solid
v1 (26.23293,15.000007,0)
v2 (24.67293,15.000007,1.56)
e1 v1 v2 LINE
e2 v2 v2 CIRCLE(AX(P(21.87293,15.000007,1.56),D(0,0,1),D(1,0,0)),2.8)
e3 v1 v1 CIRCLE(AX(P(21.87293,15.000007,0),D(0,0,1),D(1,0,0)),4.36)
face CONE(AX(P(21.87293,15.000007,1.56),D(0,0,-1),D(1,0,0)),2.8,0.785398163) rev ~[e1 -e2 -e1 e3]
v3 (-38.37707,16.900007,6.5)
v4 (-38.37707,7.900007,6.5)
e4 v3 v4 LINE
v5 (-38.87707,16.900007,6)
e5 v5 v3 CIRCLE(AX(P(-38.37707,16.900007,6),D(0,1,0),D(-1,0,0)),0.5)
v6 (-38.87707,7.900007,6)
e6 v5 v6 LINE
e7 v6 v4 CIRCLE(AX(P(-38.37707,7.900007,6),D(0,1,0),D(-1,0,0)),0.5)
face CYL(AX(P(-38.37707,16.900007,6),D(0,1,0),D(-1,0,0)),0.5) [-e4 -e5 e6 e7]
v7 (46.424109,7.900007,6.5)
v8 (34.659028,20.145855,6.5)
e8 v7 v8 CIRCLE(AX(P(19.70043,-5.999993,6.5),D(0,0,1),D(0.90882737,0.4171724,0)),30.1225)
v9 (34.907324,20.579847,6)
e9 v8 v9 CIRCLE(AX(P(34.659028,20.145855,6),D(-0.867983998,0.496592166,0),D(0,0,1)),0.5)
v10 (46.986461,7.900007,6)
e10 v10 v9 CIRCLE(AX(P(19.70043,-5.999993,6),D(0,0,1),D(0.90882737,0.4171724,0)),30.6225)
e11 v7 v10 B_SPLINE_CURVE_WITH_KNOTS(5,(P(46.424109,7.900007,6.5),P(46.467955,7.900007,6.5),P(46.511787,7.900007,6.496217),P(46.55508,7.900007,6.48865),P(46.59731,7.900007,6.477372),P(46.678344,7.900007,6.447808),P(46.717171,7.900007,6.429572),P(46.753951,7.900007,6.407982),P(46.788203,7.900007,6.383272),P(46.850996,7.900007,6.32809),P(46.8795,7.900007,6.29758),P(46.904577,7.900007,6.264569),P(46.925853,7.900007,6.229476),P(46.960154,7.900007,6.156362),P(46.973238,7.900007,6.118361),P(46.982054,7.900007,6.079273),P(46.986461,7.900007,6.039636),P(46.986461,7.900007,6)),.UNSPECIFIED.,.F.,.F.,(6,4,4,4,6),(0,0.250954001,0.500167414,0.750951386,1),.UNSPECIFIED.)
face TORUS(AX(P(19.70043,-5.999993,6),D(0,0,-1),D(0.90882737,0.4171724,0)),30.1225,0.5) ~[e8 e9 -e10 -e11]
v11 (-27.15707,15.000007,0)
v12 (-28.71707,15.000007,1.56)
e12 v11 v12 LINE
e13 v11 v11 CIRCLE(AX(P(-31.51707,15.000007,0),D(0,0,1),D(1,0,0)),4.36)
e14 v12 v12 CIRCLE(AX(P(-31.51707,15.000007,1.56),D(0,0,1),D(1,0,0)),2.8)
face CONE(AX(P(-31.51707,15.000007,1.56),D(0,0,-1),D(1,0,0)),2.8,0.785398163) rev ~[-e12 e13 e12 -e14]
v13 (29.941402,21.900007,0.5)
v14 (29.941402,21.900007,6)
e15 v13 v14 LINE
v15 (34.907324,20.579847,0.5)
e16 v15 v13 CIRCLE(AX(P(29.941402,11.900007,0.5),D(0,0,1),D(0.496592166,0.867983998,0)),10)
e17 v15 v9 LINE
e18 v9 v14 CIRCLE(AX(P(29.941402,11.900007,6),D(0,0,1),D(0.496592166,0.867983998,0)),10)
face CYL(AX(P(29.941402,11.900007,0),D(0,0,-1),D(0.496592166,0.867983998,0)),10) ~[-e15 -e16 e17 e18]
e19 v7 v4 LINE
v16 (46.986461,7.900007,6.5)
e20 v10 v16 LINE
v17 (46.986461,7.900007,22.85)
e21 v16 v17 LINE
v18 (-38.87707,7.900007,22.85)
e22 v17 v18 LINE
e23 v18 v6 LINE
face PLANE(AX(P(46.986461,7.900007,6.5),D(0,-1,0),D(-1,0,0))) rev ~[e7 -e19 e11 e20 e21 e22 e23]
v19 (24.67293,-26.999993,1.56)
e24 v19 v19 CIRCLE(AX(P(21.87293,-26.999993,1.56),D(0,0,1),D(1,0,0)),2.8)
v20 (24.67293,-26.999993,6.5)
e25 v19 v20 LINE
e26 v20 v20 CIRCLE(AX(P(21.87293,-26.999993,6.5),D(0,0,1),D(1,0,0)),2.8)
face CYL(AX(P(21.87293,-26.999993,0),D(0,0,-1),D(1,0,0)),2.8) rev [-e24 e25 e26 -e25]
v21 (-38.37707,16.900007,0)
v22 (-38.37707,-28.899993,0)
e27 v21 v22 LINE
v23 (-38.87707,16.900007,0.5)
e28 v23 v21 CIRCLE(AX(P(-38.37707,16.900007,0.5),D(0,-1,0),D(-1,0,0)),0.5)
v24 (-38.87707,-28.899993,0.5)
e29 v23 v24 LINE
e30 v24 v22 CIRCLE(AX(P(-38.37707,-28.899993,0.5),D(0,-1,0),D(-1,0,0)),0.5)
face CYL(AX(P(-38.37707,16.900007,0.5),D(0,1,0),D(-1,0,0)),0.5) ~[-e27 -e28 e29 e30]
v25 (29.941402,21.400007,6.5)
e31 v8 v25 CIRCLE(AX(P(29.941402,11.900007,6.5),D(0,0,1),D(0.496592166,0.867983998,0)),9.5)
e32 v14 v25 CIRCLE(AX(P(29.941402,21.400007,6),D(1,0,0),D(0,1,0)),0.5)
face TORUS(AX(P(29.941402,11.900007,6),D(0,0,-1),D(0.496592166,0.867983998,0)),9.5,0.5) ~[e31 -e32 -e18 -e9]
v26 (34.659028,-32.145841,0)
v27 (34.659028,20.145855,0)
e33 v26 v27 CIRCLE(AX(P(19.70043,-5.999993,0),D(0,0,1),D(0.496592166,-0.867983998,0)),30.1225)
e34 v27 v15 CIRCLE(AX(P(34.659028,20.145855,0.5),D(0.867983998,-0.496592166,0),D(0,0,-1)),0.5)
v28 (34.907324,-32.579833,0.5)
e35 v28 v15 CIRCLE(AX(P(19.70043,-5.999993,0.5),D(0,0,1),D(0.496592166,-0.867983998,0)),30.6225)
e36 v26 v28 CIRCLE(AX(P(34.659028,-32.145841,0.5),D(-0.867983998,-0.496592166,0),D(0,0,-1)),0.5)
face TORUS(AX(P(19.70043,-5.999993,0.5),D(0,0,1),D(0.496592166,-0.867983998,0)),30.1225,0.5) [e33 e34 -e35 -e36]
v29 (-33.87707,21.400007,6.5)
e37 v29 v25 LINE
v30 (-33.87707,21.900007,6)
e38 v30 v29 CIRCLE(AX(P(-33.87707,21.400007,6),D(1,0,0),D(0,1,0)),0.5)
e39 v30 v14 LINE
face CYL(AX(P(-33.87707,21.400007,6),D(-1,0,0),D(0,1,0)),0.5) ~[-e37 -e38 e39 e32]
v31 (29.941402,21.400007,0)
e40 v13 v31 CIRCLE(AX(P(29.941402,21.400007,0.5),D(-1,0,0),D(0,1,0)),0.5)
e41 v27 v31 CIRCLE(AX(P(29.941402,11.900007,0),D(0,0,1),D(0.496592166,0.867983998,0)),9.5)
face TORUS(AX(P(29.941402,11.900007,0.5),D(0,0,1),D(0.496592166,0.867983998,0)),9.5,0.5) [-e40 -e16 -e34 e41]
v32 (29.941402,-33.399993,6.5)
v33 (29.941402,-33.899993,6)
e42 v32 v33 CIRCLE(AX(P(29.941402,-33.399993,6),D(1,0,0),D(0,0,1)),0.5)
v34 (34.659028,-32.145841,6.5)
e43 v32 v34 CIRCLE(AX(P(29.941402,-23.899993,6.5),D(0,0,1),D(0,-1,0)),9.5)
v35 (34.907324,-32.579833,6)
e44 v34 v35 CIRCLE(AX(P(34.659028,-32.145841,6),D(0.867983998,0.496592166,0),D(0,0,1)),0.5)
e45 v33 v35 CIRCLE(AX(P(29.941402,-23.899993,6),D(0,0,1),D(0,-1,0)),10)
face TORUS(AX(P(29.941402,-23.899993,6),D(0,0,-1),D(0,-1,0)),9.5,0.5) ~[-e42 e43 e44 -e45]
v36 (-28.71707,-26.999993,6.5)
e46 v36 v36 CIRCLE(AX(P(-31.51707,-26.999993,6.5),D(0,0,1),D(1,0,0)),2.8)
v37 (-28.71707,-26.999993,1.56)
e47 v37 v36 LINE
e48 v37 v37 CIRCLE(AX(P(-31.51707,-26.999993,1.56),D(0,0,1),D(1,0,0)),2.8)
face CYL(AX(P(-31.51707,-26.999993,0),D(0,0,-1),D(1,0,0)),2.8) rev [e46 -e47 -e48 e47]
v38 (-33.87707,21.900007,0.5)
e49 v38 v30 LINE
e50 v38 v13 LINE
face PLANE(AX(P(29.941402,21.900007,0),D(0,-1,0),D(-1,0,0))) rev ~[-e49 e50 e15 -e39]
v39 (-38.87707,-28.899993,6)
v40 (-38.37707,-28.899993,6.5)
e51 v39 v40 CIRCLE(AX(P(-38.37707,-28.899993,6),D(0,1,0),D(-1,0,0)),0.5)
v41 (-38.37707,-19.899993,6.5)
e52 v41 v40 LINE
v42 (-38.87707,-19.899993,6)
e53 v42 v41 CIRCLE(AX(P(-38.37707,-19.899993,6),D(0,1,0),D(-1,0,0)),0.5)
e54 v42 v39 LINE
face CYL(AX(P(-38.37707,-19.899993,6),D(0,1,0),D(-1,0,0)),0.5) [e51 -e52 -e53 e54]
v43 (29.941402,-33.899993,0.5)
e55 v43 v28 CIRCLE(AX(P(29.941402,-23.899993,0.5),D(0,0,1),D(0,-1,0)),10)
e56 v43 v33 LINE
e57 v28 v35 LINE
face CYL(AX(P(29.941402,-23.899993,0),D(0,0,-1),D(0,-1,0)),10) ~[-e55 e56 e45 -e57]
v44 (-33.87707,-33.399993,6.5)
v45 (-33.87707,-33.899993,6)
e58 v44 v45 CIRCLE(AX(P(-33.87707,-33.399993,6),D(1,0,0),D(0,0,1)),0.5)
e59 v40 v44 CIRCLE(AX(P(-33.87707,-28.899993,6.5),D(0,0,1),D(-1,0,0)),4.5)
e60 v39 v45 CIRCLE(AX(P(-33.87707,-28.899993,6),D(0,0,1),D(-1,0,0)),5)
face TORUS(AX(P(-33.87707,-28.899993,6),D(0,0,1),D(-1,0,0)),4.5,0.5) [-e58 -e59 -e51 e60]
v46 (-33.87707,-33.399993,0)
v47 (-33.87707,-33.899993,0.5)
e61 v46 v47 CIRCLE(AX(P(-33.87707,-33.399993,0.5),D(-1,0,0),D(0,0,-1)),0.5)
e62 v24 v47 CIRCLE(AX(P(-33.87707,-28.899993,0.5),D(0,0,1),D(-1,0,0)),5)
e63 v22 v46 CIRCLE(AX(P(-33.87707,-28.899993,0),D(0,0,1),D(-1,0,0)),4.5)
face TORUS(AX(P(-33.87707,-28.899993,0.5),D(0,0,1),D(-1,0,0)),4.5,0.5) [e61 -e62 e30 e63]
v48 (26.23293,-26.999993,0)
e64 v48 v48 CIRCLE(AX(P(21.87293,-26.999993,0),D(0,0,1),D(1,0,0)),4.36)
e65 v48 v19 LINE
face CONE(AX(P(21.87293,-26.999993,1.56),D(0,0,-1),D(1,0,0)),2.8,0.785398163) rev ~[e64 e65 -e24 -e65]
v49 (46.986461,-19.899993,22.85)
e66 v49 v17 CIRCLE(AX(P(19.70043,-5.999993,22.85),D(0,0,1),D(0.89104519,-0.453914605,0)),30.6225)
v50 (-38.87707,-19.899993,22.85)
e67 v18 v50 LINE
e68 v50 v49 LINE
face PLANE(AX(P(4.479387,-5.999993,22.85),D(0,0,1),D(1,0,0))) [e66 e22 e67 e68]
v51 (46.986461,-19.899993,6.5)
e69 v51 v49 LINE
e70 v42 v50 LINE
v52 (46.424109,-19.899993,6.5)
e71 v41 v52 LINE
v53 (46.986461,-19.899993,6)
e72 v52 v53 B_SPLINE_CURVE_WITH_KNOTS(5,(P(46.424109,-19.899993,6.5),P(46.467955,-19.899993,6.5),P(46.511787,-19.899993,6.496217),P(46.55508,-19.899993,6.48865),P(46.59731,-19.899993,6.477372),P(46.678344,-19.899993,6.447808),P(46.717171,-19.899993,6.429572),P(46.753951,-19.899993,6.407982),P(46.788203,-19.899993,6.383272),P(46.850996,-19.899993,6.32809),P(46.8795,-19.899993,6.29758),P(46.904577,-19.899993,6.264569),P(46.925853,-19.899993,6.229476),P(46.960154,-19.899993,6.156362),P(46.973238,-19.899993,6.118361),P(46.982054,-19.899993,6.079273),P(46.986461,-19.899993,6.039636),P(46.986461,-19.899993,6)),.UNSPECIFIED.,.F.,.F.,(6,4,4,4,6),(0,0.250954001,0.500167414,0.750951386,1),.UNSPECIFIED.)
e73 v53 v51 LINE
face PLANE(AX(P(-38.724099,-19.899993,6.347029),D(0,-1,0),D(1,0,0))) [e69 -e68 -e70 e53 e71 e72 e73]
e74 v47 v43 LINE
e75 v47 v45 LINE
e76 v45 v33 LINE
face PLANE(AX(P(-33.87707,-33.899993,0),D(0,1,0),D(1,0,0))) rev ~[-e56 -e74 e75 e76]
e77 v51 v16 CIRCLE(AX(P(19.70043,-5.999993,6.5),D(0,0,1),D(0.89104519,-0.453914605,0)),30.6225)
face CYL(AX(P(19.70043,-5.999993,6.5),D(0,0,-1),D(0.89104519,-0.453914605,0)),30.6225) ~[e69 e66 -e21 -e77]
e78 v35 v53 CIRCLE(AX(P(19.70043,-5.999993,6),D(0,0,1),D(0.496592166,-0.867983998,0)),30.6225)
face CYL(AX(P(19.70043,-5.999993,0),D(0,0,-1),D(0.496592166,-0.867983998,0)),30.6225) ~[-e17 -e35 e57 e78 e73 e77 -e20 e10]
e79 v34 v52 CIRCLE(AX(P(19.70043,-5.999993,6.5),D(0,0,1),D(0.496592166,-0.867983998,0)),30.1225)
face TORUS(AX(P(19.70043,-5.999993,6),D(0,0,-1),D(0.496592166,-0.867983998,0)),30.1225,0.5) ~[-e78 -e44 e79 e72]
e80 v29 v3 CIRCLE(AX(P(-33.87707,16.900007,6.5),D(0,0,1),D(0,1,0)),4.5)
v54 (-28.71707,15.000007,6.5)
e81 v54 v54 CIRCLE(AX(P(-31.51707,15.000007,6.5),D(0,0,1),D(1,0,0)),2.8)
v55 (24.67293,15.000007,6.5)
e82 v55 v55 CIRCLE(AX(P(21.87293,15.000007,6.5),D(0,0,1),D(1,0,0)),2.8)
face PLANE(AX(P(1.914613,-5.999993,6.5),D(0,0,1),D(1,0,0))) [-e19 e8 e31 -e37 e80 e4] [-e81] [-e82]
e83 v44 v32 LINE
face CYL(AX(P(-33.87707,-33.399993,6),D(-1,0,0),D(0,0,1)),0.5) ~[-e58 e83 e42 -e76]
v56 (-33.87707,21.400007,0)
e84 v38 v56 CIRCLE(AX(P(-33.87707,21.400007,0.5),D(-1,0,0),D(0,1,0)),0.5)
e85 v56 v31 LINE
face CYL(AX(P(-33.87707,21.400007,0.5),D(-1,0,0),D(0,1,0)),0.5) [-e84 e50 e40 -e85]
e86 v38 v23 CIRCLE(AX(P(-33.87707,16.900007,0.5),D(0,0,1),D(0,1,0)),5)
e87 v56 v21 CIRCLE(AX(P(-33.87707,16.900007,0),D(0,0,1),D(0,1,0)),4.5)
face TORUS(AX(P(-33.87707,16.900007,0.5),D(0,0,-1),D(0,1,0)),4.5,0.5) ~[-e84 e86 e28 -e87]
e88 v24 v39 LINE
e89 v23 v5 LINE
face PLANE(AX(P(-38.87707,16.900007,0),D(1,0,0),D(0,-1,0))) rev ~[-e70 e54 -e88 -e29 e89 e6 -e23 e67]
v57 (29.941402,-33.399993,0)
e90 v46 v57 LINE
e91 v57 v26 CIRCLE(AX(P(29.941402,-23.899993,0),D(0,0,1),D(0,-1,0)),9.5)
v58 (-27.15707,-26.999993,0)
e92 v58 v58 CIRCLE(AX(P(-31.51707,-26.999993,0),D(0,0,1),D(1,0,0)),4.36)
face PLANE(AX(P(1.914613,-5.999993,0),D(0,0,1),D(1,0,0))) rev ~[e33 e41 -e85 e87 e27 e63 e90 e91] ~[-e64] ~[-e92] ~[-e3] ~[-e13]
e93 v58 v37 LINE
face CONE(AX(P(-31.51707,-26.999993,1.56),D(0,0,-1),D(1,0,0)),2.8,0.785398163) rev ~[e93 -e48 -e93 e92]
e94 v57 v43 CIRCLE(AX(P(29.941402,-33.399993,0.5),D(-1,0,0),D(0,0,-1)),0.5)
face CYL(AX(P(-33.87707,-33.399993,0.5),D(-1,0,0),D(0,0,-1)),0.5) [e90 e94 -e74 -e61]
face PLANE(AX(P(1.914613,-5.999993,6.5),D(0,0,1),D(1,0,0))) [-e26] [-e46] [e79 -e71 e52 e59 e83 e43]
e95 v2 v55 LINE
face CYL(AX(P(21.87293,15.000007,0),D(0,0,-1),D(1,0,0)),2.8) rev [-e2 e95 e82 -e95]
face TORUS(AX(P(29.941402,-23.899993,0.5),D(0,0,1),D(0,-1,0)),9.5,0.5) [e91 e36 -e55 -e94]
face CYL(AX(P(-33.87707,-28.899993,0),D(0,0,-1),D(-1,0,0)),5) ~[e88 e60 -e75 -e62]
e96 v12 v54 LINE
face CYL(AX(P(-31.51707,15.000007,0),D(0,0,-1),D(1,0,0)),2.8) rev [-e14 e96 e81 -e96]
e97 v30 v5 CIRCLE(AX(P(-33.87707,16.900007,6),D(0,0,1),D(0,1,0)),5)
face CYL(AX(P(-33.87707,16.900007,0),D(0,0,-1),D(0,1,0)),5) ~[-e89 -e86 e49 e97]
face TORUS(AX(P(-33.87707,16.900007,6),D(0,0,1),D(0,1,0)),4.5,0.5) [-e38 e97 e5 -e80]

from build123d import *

# Parameters (mm, degrees)
F0_R         = 2.8
F1_DEPTH     = 6.5
F3_DEPTH     = 16.35
F4_T1_DEPTH  = 63.8184719387
F4_T3_DEPTH  = 45.8
F4_T5_DEPTH  = 9
F4_T7_DEPTH  = 9
F4_T10_ANGLE = 90
F4_T12_ANGLE = 120.4504110916
F4_T14_ANGLE = 90
F4_T16_ANGLE = 90
F4_T18_ANGLE = 29.7747944542
F4_T20_ANGLE = 29.7747944542
F4_T22_ANGLE = 29.7747944542
F4_T26_ANGLE = 35.5690080159
F4_T29_ANGLE = 90
F4_T33_ANGLE = 35.5690080159
F4_T36_ANGLE = 29.7747944542
F5_SIZE      = 1.56


# Not quite as in the source:
# - a fillet or chamfer that OpenCascade refuses, or shapes differently, is made with other operations: its cross-section is extruded or revolved along the edge and cut away or added


with BuildPart() as f1:
    # F0 (on Top) → F1 (new body)
    with BuildSketch(Plane.XY):
        with BuildLine():
            Line((-38.8770699501, 16.9000072956), (-38.8770699501, -28.8999927044))
            ThreePointArc((-38.8770699501, -28.8999927044), (-37.412603856, -32.4355266103), (-33.8770699501, -33.8999927044))
            Line((-33.8770699501, -33.8999927044), (29.9414019886, -33.8999927044))
            ThreePointArc((29.9414019886, -33.8999927044), (32.5106042183, -33.5643188528), (34.9073236464, -32.579832685))
            ThreePointArc((34.9073236464, -32.579832685), (50.3229300499, -5.9999927044), (34.9073236464, 20.5798472762))
            ThreePointArc((34.9073236464, 20.5798472762), (32.5106042183, 21.564333444), (29.9414019886, 21.9000072956))
            Line((29.9414019886, 21.9000072956), (-33.8770699501, 21.9000072956))
            ThreePointArc((-33.8770699501, 21.9000072956), (-37.412603856, 20.4355412015), (-38.8770699501, 16.9000072956))
        make_face()
        with Locations((-31.5170697868, -26.9999932498)):
            Circle(F0_R, mode=Mode.SUBTRACT)
        with Locations((21.8729300499, -26.9999927044)):
            Circle(F0_R, mode=Mode.SUBTRACT)
        with Locations((-31.5170697868, 15.0000071153)):
            Circle(F0_R, mode=Mode.SUBTRACT)
        with Locations((21.8729300499, 15.0000072956)):
            Circle(F0_R, mode=Mode.SUBTRACT)
    extrude(amount=F1_DEPTH)

    # F2 (on face) → F3 (join)
    with BuildSketch(Plane.XY.offset(6.5)):
        with BuildLine():
            Line((-38.8770699501, 7.9000072956), (-38.8770699501, -5.9999927044))
            Line((-38.8770699501, -5.9999927044), (-38.8770699501, -19.8999927044))
            Line((-38.8770699501, -19.8999927044), (46.9864613892, -19.8999927044))
            ThreePointArc((46.9864613892, -19.8999927044), (50.3229300499, -5.9999927044), (46.9864613892, 7.9000072956))
            Line((46.9864613892, 7.9000072956), (-38.8770699501, 7.9000072956))
        make_face()
    extrude(amount=F3_DEPTH)

    # F4: fillet of radius 0.5 on 18 edges, made by hand

    # F4_s2 → F4_t1 (cut)
    with BuildSketch(Plane.YZ.offset(-33.8770699501)):
        with BuildLine():
            ThreePointArc((21.9000072956, 0.5), (21.7535606862, 0.1464466094), (21.4000072956, 0))
            Line((21.4000072956, 0), (21.9000072956, 0))
            Line((21.9000072956, 0), (21.9000072956, 0.5))
        make_face()
        with BuildLine():
            ThreePointArc((21.9000072956, 6), (21.7535606862, 6.3535533906), (21.4000072956, 6.5))
            Line((21.4000072956, 6.5), (21.9000072956, 6.5))
            Line((21.9000072956, 6.5), (21.9000072956, 6))
        make_face()
        with BuildLine():
            ThreePointArc((-33.3999927044, 6.5), (-33.753546095, 6.3535533906), (-33.8999927044, 6))
            Line((-33.8999927044, 6), (-33.8999927044, 6.5))
            Line((-33.8999927044, 6.5), (-33.3999927044, 6.5))
        make_face()
        with BuildLine():
            ThreePointArc((-33.3999927044, 0), (-33.753546095, 0.1464466094), (-33.8999927044, 0.5))
            Line((-33.8999927044, 0.5), (-33.8999927044, 0))
            Line((-33.8999927044, 0), (-33.3999927044, 0))
        make_face()
    extrude(amount=F4_T1_DEPTH, mode=Mode.SUBTRACT)

    # F4_s4 → F4_t3 (cut)
    with BuildSketch(Plane.XZ.offset(-16.9000072956)):
        with BuildLine():
            ThreePointArc((-38.8770699501, 0.5), (-38.7306233407, 0.1464466094), (-38.3770699501, 0))
            Line((-38.3770699501, 0), (-38.8770699501, 0))
            Line((-38.8770699501, 0), (-38.8770699501, 0.5))
        make_face()
    extrude(amount=F4_T3_DEPTH, mode=Mode.SUBTRACT)

    # F4_s6 → F4_t5 (cut)
    with BuildSketch(Plane.XZ.offset(-16.9000072956)):
        with BuildLine():
            ThreePointArc((-38.8770699501, 6), (-38.7306233407, 6.3535533906), (-38.3770699501, 6.5))
            Line((-38.3770699501, 6.5), (-38.8770699501, 6.5))
            Line((-38.8770699501, 6.5), (-38.8770699501, 6))
        make_face()
    extrude(amount=F4_T5_DEPTH, mode=Mode.SUBTRACT)

    # F4_s8 → F4_t7 (cut)
    with BuildSketch(Plane.XZ.offset(19.8999927044)):
        with BuildLine():
            ThreePointArc((-38.8770699501, 6), (-38.7306233407, 6.3535533906), (-38.3770699501, 6.5))
            Line((-38.3770699501, 6.5), (-38.8770699501, 6.5))
            Line((-38.8770699501, 6.5), (-38.8770699501, 6))
        make_face()
    extrude(amount=F4_T7_DEPTH, mode=Mode.SUBTRACT)

    # F4_s9 → F4_t10 (revolve, cut)
    with BuildSketch(Plane.YZ.offset(-33.8770699501)):
        with BuildLine():
            ThreePointArc((21.9000072956, 0.5), (21.7535606862, 0.1464466094), (21.4000072956, 0))
            Line((21.4000072956, 0), (21.9000072956, 0))
            Line((21.9000072956, 0), (21.9000072956, 0.5))
        make_face()
    revolve(axis=Axis((-33.8770699501, 16.9000072956, 0), (0, 0, 1)), revolution_arc=F4_T10_ANGLE, mode=Mode.SUBTRACT)

    # F4_s11 → F4_t12 (revolve, cut)
    with BuildSketch(Plane(origin=(12.2560283734, 7.0119353437, 0), x_dir=(0, 0, 1), z_dir=(-0.8679839981, -0.4965921658, 0))):
        with BuildLine():
            ThreePointArc((0, -45.1134768811), (0.1464466094, -45.4670302717), (0.5, -45.6134768811))
            Line((0.5, -45.6134768811), (0, -45.6134768811))
            Line((0, -45.6134768811), (0, -45.1134768811))
        make_face()
    revolve(axis=Axis((19.7004300499, -5.9999927044, 0), (0, 0, 1)), revolution_arc=F4_T12_ANGLE, mode=Mode.SUBTRACT)

    # F4_s13 → F4_t14 (revolve, cut)
    with BuildSketch(Plane.YZ.offset(-33.8770699501)):
        with BuildLine():
            ThreePointArc((21.9000072956, 6), (21.7535606862, 6.3535533906), (21.4000072956, 6.5))
            Line((21.4000072956, 6.5), (21.9000072956, 6.5))
            Line((21.9000072956, 6.5), (21.9000072956, 6))
        make_face()
    revolve(axis=Axis((-33.8770699501, 16.9000072956, 6.5), (0, 0, 1)), revolution_arc=F4_T14_ANGLE, mode=Mode.SUBTRACT)

    # F4_s15 → F4_t16 (revolve, cut)
    with BuildSketch(Plane.XZ.offset(28.8999927044)):
        with BuildLine():
            ThreePointArc((-38.3770699501, 0), (-38.7306233407, 0.1464466094), (-38.8770699501, 0.5))
            Line((-38.8770699501, 0.5), (-38.8770699501, 0))
            Line((-38.8770699501, 0), (-38.3770699501, 0))
        make_face()
    revolve(axis=Axis((-33.8770699501, -28.8999927044, 0), (0, 0, 1)), revolution_arc=F4_T16_ANGLE, mode=Mode.SUBTRACT)

    # F4_s17 → F4_t18 (revolve, cut)
    with BuildSketch(Plane.YZ.offset(29.9414019886)):
        with BuildLine():
            ThreePointArc((-33.3999927044, 0), (-33.753546095, 0.1464466094), (-33.8999927044, 0.5))
            Line((-33.8999927044, 0.5), (-33.8999927044, 0))
            Line((-33.8999927044, 0), (-33.3999927044, 0))
        make_face()
    revolve(axis=Axis((29.9414019886, -23.8999927044, 0), (0, 0, 1)), revolution_arc=F4_T18_ANGLE, mode=Mode.SUBTRACT)

    # F4_s19 → F4_t20 (revolve, cut)
    with BuildSketch(Plane(origin=(17.4284307256, -9.9711770948, 0), x_dir=(0, 0, 1), z_dir=(0.8679839981, -0.4965921658, 0))):
        with BuildLine():
            ThreePointArc((0, -34.6976815693), (0.1464466094, -35.0512349599), (0.5, -35.1976815693))
            Line((0.5, -35.1976815693), (0, -35.1976815693))
            Line((0, -35.1976815693), (0, -34.6976815693))
        make_face()
    revolve(axis=Axis((29.9414019886, 11.9000072956, 0), (0, 0, 1)), revolution_arc=F4_T20_ANGLE, mode=Mode.SUBTRACT)

    # F4_s21 → F4_t22 (revolve, cut)
    with BuildSketch(Plane(origin=(17.4284307256, -9.9711770948, 0), x_dir=(0, 0, 1), z_dir=(0.8679839981, -0.4965921658, 0))):
        with BuildLine():
            ThreePointArc((6.5, -34.6976815693), (6.3535533906, -35.0512349599), (6, -35.1976815693))
            Line((6, -35.1976815693), (6.5, -35.1976815693))
            Line((6.5, -35.1976815693), (6.5, -34.6976815693))
        make_face()
    revolve(axis=Axis((29.9414019886, 11.9000072956, 6.5), (0, 0, 1)), revolution_arc=F4_T22_ANGLE, mode=Mode.SUBTRACT)


with BuildPart() as f4_tool24:
    # F4_s25 → F4_t26 (revolve)
    with BuildSketch(Plane(origin=(5.7033446243, -12.4249727464, 0), x_dir=(0, 0, 1), z_dir=(0.4171723997, -0.9088273703, 0))):
        with BuildLine():
            ThreePointArc((6.5, -45.5237586807), (6.3535533906, -45.8773120713), (6, -46.0237586807))
            Line((6, -46.0237586807), (6.5, -46.0237586807))
            Line((6.5, -46.0237586807), (6.5, -45.5237586807))
        make_face()
    revolve(axis=Axis((19.7004300499, -5.9999927044, 6.5), (0, 0, 1)), revolution_arc=F4_T26_ANGLE)

    split(bisect_by=Plane.XZ.offset(-7.9000072956), keep=Keep.BOTTOM)


with BuildPart() as f1_1:
    add(f1.part)

    # F4_t23: cut F4_tool24
    add(f4_tool24.part, mode=Mode.SUBTRACT)

    # F4_s28 → F4_t29 (revolve, cut)
    with BuildSketch(Plane.XZ.offset(28.8999927044)):
        with BuildLine():
            ThreePointArc((-38.8770699501, 6), (-38.7306233407, 6.3535533906), (-38.3770699501, 6.5))
            Line((-38.3770699501, 6.5), (-38.8770699501, 6.5))
            Line((-38.8770699501, 6.5), (-38.8770699501, 6))
        make_face()
    revolve(axis=Axis((-33.8770699501, -28.8999927044, 6.5), (0, 0, 1)), revolution_arc=F4_T29_ANGLE, mode=Mode.SUBTRACT)


with BuildPart() as f4_tool31:
    # F4_s32 → F4_t33 (revolve)
    with BuildSketch(Plane(origin=(12.2560283734, 7.0119353437, 0), x_dir=(0, 0, 1), z_dir=(-0.8679839981, -0.4965921658, 0))):
        with BuildLine():
            ThreePointArc((6.5, -45.1134768811), (6.3535533906, -45.4670302717), (6, -45.6134768811))
            Line((6, -45.6134768811), (6.5, -45.6134768811))
            Line((6.5, -45.6134768811), (6.5, -45.1134768811))
        make_face()
    revolve(axis=Axis((19.7004300499, -5.9999927044, 6.5), (0, 0, 1)), revolution_arc=F4_T33_ANGLE)

    split(bisect_by=Plane.XZ.offset(19.8999927044), keep=Keep.TOP)


with BuildPart() as f1_2:
    add(f1_1.part)

    # F4_t30: cut F4_tool31
    add(f4_tool31.part, mode=Mode.SUBTRACT)

    # F4_s35 → F4_t36 (revolve, cut)
    with BuildSketch(Plane.YZ.offset(29.9414019886)):
        with BuildLine():
            ThreePointArc((-33.3999927044, 6.5), (-33.753546095, 6.3535533906), (-33.8999927044, 6))
            Line((-33.8999927044, 6), (-33.8999927044, 6.5))
            Line((-33.8999927044, 6.5), (-33.3999927044, 6.5))
        make_face()
    revolve(axis=Axis((29.9414019886, -23.8999927044, 6.5), (0, 0, 1)), revolution_arc=F4_T36_ANGLE, mode=Mode.SUBTRACT)

    # F5
    f5_edges = [f1_2.edges().sort_by_distance(p)[0] for p in [
        (-34.31707, 15.000007, 0),
        (-34.31707, -26.999993, 0),
        (19.07293, -26.999993, 0),
        (19.07293, 15.000007, 0),
    ]]
    chamfer(f5_edges, length=F5_SIZE)


solid = f1_2.part
